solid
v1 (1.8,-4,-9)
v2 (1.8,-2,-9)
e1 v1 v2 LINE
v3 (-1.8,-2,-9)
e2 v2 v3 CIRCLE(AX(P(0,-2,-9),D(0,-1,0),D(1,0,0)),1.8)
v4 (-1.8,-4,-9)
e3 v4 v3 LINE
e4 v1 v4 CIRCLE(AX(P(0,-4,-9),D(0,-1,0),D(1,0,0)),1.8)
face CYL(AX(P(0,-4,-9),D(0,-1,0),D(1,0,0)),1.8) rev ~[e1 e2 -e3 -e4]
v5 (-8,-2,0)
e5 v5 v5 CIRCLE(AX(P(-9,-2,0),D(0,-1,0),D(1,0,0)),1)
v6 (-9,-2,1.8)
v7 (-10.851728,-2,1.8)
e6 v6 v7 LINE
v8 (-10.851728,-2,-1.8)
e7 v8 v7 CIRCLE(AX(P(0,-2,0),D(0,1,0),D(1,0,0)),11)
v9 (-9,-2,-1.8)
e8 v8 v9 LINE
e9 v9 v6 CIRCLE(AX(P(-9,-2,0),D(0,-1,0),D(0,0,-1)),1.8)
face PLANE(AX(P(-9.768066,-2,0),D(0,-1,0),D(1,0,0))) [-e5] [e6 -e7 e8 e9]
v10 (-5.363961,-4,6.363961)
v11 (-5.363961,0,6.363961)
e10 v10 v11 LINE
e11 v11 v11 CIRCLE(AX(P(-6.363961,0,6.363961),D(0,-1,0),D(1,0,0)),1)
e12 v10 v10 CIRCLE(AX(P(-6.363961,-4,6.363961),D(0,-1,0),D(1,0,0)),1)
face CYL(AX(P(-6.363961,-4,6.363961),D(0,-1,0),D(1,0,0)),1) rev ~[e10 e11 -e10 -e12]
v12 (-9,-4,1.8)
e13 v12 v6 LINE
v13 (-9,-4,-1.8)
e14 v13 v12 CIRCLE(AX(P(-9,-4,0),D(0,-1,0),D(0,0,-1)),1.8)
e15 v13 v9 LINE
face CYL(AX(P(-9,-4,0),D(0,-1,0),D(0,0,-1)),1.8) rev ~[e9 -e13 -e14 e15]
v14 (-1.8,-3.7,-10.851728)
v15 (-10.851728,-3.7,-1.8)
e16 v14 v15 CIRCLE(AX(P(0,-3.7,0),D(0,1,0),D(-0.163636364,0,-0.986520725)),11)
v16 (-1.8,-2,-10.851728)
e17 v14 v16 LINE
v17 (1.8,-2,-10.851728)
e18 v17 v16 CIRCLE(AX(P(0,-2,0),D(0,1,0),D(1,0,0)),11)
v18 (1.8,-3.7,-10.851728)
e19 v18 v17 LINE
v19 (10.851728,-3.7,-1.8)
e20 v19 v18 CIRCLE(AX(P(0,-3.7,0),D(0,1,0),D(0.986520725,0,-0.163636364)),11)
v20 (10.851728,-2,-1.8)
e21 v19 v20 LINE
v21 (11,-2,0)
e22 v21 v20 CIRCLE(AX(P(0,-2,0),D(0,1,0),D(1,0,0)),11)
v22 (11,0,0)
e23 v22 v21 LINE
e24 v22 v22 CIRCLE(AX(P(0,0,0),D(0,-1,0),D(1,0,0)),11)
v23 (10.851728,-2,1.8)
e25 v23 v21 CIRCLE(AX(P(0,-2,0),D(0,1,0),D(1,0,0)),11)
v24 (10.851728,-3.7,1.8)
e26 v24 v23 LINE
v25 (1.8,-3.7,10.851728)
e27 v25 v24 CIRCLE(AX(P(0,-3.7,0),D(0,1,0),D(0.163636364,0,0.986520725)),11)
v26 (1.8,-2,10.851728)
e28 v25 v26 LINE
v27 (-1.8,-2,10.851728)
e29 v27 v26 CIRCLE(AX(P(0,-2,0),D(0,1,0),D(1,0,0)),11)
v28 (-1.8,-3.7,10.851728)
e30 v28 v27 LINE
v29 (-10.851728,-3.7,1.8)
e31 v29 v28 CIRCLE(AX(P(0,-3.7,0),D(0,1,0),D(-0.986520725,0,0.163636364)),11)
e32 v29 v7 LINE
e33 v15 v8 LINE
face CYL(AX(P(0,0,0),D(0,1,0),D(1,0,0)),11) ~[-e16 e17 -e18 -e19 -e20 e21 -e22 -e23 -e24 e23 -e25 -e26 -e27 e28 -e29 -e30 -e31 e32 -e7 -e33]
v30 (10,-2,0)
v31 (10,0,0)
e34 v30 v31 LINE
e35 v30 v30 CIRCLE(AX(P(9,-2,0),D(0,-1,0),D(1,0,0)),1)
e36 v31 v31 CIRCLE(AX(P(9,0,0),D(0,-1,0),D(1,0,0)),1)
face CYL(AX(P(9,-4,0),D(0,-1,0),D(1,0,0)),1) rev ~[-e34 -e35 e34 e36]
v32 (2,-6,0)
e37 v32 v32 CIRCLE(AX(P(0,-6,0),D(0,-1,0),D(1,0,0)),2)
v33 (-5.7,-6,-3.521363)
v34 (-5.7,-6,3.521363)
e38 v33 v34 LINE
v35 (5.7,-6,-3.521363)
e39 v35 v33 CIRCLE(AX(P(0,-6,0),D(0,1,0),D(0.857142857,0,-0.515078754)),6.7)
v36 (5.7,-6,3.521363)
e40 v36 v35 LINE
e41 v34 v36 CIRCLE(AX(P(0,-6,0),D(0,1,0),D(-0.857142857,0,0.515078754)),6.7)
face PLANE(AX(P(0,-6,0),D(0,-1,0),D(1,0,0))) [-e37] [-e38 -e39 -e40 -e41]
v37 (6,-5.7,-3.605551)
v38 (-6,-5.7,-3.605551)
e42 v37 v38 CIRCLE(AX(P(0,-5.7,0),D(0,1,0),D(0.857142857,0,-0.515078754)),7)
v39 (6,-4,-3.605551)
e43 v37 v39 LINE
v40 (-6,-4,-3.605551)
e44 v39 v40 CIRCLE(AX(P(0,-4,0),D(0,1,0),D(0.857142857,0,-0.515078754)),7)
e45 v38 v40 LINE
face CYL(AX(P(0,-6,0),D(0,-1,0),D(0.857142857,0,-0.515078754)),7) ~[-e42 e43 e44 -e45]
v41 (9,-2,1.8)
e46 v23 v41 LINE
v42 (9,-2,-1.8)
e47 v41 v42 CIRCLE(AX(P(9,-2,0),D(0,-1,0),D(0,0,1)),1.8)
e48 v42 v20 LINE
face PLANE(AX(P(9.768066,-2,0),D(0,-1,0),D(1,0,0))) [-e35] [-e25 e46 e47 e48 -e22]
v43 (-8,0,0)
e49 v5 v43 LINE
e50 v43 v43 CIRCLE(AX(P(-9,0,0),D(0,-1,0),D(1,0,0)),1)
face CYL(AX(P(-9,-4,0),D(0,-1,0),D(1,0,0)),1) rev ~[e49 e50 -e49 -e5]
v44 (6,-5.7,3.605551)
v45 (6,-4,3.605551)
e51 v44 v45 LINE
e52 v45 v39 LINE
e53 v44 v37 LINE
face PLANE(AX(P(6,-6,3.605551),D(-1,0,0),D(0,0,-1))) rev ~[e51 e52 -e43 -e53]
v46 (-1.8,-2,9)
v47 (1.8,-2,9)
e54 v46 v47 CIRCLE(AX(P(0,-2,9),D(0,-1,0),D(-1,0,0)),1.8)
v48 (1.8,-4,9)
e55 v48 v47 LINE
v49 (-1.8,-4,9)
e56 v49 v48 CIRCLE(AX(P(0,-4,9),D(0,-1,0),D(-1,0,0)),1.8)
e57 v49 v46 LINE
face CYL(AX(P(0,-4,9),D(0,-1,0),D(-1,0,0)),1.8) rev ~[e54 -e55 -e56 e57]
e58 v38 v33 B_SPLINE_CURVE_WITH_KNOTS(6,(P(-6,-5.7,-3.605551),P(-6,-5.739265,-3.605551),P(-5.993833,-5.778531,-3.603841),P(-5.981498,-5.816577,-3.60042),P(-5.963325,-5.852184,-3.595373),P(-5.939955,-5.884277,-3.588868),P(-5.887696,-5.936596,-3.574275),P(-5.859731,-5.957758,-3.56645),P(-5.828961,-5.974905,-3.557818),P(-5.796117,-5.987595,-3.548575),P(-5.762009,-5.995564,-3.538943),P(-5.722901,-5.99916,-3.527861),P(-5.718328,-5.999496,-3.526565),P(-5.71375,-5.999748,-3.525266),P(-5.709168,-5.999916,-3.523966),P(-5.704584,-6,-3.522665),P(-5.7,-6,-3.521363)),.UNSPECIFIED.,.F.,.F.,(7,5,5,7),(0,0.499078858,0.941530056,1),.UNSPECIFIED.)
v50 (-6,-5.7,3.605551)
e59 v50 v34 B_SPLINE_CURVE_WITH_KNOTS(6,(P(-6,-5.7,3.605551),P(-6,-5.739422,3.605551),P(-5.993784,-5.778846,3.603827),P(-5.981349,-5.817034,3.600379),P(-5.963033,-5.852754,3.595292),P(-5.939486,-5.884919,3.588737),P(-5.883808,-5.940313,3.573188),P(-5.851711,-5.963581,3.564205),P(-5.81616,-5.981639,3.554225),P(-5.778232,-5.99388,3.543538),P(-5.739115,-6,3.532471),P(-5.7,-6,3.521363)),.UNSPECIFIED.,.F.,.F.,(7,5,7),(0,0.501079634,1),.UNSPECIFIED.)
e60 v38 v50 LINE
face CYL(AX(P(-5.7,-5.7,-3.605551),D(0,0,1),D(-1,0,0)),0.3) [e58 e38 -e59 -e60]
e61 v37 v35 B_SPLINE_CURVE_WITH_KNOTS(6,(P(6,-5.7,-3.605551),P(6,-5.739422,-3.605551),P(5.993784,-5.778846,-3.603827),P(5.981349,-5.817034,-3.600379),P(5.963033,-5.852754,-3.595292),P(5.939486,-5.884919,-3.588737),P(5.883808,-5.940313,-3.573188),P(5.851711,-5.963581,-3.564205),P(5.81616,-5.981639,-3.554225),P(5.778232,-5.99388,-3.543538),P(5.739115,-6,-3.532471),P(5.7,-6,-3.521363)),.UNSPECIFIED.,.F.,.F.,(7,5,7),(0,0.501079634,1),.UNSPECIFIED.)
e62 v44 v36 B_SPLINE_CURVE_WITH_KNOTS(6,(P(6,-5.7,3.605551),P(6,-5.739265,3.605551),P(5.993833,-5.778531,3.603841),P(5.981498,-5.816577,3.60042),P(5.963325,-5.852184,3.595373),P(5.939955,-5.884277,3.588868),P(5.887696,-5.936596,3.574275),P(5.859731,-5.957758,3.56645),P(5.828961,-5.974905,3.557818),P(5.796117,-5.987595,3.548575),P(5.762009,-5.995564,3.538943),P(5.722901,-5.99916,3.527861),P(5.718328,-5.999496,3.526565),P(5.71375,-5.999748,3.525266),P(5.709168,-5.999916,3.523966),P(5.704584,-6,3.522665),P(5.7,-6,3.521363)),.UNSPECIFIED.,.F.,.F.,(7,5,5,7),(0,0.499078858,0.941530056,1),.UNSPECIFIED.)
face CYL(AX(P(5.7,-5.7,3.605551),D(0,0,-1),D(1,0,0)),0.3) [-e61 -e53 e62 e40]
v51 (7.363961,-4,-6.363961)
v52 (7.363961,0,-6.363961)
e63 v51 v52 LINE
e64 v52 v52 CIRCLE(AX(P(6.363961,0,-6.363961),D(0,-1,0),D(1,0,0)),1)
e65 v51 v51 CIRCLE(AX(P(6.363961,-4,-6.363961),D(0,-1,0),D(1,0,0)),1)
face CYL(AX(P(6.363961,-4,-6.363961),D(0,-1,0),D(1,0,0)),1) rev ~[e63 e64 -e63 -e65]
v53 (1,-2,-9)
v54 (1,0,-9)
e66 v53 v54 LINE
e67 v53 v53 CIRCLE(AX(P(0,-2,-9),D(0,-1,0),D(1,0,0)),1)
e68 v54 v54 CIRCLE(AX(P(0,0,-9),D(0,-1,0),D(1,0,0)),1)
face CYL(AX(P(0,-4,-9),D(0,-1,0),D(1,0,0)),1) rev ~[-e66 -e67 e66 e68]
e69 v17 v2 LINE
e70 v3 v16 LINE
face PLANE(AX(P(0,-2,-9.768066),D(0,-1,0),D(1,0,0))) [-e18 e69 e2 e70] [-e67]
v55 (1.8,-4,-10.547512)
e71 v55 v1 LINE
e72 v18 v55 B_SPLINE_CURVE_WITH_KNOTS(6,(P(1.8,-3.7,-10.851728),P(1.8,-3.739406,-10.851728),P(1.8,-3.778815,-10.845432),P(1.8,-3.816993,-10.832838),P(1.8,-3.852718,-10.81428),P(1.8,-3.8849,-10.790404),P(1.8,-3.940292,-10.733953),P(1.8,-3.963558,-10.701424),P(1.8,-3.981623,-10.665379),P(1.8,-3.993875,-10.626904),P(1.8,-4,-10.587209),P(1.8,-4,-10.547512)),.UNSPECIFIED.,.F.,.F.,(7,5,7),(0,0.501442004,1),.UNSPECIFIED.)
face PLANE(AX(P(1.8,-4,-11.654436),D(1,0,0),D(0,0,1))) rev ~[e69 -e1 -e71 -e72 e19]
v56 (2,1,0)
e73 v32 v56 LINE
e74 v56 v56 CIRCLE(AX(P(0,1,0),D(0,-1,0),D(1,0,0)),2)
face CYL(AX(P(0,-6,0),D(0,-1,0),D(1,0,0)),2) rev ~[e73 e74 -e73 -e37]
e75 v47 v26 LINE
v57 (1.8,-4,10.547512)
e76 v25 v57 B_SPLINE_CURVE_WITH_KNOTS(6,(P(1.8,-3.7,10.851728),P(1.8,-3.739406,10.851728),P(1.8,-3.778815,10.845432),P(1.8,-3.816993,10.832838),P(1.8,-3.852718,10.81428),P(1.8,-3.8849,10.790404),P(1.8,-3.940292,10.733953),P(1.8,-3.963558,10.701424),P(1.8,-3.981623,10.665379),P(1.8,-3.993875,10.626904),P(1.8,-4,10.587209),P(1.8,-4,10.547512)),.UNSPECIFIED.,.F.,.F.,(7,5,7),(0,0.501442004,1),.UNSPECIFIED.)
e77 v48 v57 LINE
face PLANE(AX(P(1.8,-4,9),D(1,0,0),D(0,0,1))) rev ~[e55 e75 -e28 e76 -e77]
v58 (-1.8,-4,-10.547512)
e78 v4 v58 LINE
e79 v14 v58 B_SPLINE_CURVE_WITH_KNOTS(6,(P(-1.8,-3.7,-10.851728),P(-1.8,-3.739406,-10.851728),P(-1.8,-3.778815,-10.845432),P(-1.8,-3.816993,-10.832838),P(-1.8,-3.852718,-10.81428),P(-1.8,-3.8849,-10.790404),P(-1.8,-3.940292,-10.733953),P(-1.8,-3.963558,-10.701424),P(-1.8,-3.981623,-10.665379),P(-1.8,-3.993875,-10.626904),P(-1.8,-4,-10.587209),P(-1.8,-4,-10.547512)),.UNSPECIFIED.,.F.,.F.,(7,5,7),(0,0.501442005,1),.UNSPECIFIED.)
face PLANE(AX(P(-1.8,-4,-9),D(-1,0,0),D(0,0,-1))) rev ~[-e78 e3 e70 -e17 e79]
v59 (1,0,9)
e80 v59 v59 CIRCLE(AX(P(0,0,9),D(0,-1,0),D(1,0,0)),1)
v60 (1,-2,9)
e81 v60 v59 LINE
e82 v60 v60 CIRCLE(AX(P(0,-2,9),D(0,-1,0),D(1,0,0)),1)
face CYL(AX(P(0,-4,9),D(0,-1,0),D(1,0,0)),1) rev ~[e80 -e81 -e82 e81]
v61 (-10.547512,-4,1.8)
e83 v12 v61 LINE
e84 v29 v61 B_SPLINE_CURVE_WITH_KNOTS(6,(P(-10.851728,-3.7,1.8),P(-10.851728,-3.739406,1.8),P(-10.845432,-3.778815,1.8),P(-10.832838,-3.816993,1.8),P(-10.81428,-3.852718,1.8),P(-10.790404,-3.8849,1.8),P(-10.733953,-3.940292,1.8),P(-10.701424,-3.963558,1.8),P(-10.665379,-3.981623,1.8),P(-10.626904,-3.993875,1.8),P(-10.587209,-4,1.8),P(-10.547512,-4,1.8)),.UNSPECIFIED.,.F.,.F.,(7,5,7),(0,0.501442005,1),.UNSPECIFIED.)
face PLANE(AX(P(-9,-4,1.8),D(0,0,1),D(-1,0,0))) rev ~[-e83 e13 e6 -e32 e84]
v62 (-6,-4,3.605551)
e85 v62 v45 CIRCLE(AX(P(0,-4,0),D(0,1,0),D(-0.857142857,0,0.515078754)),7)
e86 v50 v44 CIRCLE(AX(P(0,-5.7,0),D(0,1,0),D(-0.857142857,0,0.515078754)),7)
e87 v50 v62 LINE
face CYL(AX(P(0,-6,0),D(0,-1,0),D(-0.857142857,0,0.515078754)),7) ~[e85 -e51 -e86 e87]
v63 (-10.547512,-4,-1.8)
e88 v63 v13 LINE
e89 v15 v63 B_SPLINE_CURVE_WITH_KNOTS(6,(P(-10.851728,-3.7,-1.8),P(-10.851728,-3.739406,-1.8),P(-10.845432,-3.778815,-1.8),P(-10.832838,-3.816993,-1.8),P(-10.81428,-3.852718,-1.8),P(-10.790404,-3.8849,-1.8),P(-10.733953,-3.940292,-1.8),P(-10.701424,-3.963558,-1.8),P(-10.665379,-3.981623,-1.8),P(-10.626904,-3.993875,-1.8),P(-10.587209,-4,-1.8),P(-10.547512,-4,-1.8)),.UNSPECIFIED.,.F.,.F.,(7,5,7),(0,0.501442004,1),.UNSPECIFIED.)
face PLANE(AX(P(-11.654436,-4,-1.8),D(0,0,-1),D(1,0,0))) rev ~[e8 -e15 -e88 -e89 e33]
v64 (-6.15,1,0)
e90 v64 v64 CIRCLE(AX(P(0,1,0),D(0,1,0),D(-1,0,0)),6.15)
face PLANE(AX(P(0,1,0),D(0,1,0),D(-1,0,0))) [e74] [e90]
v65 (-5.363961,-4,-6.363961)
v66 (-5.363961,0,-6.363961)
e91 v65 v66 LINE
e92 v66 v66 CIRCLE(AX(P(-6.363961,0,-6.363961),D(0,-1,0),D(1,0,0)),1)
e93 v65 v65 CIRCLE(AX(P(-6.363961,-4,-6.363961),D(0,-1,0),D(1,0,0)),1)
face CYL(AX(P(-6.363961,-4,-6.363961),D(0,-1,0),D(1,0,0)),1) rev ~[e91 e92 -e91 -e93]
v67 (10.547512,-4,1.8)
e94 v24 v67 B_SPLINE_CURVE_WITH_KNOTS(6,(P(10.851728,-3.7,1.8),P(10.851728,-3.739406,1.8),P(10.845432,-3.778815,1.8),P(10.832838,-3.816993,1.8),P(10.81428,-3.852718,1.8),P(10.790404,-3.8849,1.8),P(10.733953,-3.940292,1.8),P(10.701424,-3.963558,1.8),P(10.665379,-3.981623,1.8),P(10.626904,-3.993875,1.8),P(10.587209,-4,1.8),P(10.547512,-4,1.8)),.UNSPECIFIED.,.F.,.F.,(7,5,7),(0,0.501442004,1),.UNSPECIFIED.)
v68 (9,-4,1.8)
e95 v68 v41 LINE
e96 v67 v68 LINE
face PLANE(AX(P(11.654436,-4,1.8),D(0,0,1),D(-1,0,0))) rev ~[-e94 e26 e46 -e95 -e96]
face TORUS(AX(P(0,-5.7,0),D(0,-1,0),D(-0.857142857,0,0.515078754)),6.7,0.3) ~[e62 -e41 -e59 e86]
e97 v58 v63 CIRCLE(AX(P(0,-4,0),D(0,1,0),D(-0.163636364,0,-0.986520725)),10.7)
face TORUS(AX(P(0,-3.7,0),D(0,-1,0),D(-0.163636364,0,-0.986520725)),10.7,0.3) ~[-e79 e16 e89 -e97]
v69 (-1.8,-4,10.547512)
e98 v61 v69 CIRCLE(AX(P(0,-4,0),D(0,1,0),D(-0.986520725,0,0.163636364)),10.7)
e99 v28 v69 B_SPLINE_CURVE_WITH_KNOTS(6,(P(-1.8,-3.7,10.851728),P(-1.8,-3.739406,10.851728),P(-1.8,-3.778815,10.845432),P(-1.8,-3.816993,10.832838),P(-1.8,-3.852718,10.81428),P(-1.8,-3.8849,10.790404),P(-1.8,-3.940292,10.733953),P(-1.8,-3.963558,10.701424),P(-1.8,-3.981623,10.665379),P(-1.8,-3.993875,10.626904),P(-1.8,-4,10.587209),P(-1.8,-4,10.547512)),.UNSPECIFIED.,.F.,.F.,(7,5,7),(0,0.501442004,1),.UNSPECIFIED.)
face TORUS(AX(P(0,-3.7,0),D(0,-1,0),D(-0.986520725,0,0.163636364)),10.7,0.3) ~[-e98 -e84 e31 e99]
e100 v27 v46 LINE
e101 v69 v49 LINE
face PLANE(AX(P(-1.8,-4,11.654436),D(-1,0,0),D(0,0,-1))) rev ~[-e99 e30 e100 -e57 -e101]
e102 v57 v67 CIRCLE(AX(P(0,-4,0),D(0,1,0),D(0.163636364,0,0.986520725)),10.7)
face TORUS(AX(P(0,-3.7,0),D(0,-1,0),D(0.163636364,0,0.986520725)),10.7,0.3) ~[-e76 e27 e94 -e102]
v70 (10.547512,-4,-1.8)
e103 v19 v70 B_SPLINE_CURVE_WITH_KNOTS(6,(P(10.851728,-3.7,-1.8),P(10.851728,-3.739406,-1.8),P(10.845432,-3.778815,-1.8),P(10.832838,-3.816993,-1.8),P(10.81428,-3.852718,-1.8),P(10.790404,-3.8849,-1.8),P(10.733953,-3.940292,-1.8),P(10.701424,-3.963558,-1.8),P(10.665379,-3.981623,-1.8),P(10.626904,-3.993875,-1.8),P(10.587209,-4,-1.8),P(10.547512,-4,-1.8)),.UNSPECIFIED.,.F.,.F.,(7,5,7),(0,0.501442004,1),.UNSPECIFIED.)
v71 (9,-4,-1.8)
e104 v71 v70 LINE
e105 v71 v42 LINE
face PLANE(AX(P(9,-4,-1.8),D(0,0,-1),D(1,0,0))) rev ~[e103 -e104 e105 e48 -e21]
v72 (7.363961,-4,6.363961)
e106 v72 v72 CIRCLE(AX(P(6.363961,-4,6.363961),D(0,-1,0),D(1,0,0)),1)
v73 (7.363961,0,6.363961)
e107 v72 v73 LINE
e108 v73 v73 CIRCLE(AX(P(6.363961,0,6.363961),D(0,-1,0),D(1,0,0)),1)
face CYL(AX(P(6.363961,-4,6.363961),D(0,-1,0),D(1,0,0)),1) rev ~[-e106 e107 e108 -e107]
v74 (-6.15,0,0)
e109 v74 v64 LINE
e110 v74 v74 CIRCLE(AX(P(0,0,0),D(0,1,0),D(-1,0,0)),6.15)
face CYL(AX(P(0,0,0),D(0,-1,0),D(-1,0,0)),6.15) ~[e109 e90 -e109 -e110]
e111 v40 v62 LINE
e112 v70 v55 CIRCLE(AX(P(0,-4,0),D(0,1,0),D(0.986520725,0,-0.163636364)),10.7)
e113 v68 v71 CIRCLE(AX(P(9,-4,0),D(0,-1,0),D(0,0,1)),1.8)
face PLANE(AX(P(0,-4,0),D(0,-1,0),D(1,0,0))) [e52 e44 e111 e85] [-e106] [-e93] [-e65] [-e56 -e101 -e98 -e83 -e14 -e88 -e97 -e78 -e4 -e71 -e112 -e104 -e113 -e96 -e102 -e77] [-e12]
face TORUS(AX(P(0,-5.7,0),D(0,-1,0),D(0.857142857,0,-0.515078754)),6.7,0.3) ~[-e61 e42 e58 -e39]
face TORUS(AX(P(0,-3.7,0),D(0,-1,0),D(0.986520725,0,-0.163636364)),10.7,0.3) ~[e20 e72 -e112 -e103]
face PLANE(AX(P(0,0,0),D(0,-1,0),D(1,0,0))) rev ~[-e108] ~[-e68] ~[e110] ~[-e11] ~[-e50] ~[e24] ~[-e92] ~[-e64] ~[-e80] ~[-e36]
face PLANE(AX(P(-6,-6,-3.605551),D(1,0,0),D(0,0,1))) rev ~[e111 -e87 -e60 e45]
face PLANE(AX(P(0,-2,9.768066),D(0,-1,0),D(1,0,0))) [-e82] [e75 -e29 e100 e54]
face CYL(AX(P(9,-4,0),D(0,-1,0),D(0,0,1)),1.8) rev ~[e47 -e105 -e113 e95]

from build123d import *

# Parameters (mm, degrees)
F0_R      = 11
F1_DEPTH  = 6
F2_R      = 16
F3_DEPTH  = 2
F5_R      = 1
F6_DEPTH  = 4.001
F9_DEPTH  = 2
F10_R     = 0.3
F11_R     = 6.15
F12_DEPTH = 1
F4_R      = 2
F13_DEPTH = 7.001


with BuildPart() as f1:
    # F0 (on Front) → F1 (new body)
    with BuildSketch(Plane.XZ):
        Circle(F0_R)
    extrude(amount=F1_DEPTH)

    # F2 (on face) → F3 (cut)
    with BuildSketch(Plane.XZ.offset(6)):
        Circle(F2_R)
        with BuildLine():
            ThreePointArc((6, -3.6055512755), (0, -7), (-6, -3.6055512755))
            Line((-6, -3.6055512755), (-6, 3.6055512755))
            ThreePointArc((-6, 3.6055512755), (0, 7), (6, 3.6055512755))
            Line((6, 3.6055512755), (6, -3.6055512755))
        make_face(mode=Mode.SUBTRACT)
    extrude(amount=-F3_DEPTH, mode=Mode.SUBTRACT)

    # F5 (on face) → F6 (cut, through all)
    with BuildSketch(Plane.XZ.offset(4)):
        with Locations((0, 9)):
            Circle(F5_R)
        with Locations((-6.3639610307, 6.3639610307)):
            Circle(F5_R)
        with Locations((-9, 0)):
            Circle(F5_R)
        with Locations((-6.3639610307, -6.3639610307)):
            Circle(F5_R)
        with Locations((0, -9)):
            Circle(F5_R)
        with Locations((6.3639610307, -6.3639610307)):
            Circle(F5_R)
        with Locations((9, 0)):
            Circle(F5_R)
        with Locations((6.3639610307, 6.3639610307)):
            Circle(F5_R)
    extrude(amount=-F6_DEPTH, mode=Mode.SUBTRACT)

    # F8 (on face) → F9 (cut)
    with BuildSketch(Plane.XZ.offset(4)):
        with BuildLine():
            Line((-1.8, 11.6544359102), (-1.8, 9))
            ThreePointArc((-1.8, 9), (0, 7.2), (1.8, 9))
            Line((1.8, 9), (1.8, 11.6544359102))
            Line((1.8, 11.6544359102), (-1.8, 11.6544359102))
        make_face()
        with BuildLine():
            Line((-11.6544359102, -1.8), (-9, -1.8))
            ThreePointArc((-9, -1.8), (-7.2, 0), (-9, 1.8))
            Line((-9, 1.8), (-11.6544359102, 1.8))
            Line((-11.6544359102, 1.8), (-11.6544359102, -1.8))
        make_face()
        with BuildLine():
            Line((1.8, -11.6544359102), (1.8, -9))
            ThreePointArc((1.8, -9), (0, -7.2), (-1.8, -9))
            Line((-1.8, -9), (-1.8, -11.6544359102))
            Line((-1.8, -11.6544359102), (1.8, -11.6544359102))
        make_face()
        with BuildLine():
            Line((11.6544359102, 1.8), (9, 1.8))
            ThreePointArc((9, 1.8), (7.2, 0), (9, -1.8))
            Line((9, -1.8), (11.6544359102, -1.8))
            Line((11.6544359102, -1.8), (11.6544359102, 1.8))
        make_face()
    extrude(amount=-F9_DEPTH, mode=Mode.SUBTRACT)

    # F10
    f10_edges = [f1.edges().sort_by_distance(p)[0] for p in [
        (0, -6, -7),
        (-6, -6, 0),
        (6, -6, 0),
        (0, -6, 7),
        (7.778175, -4, -7.778175),
        (-7.778175, -4, -7.778175),
        (-7.778175, -4, 7.778175),
        (7.778175, -4, 7.778175),
    ]]
    fillet(f10_edges, radius=F10_R)

    # F11 (on face) → F12 (join)
    with BuildSketch(Plane(origin=(0, 0, 0), x_dir=(-1, 0, 0), z_dir=(0, 1, 0))):
        Circle(F11_R)
    extrude(amount=F12_DEPTH)

    # F4 (on face) → F13 (cut, through all)
    with BuildSketch(Plane.XZ.offset(6)):
        Circle(F4_R)
    extrude(amount=-F13_DEPTH, mode=Mode.SUBTRACT)


solid = f1.part
